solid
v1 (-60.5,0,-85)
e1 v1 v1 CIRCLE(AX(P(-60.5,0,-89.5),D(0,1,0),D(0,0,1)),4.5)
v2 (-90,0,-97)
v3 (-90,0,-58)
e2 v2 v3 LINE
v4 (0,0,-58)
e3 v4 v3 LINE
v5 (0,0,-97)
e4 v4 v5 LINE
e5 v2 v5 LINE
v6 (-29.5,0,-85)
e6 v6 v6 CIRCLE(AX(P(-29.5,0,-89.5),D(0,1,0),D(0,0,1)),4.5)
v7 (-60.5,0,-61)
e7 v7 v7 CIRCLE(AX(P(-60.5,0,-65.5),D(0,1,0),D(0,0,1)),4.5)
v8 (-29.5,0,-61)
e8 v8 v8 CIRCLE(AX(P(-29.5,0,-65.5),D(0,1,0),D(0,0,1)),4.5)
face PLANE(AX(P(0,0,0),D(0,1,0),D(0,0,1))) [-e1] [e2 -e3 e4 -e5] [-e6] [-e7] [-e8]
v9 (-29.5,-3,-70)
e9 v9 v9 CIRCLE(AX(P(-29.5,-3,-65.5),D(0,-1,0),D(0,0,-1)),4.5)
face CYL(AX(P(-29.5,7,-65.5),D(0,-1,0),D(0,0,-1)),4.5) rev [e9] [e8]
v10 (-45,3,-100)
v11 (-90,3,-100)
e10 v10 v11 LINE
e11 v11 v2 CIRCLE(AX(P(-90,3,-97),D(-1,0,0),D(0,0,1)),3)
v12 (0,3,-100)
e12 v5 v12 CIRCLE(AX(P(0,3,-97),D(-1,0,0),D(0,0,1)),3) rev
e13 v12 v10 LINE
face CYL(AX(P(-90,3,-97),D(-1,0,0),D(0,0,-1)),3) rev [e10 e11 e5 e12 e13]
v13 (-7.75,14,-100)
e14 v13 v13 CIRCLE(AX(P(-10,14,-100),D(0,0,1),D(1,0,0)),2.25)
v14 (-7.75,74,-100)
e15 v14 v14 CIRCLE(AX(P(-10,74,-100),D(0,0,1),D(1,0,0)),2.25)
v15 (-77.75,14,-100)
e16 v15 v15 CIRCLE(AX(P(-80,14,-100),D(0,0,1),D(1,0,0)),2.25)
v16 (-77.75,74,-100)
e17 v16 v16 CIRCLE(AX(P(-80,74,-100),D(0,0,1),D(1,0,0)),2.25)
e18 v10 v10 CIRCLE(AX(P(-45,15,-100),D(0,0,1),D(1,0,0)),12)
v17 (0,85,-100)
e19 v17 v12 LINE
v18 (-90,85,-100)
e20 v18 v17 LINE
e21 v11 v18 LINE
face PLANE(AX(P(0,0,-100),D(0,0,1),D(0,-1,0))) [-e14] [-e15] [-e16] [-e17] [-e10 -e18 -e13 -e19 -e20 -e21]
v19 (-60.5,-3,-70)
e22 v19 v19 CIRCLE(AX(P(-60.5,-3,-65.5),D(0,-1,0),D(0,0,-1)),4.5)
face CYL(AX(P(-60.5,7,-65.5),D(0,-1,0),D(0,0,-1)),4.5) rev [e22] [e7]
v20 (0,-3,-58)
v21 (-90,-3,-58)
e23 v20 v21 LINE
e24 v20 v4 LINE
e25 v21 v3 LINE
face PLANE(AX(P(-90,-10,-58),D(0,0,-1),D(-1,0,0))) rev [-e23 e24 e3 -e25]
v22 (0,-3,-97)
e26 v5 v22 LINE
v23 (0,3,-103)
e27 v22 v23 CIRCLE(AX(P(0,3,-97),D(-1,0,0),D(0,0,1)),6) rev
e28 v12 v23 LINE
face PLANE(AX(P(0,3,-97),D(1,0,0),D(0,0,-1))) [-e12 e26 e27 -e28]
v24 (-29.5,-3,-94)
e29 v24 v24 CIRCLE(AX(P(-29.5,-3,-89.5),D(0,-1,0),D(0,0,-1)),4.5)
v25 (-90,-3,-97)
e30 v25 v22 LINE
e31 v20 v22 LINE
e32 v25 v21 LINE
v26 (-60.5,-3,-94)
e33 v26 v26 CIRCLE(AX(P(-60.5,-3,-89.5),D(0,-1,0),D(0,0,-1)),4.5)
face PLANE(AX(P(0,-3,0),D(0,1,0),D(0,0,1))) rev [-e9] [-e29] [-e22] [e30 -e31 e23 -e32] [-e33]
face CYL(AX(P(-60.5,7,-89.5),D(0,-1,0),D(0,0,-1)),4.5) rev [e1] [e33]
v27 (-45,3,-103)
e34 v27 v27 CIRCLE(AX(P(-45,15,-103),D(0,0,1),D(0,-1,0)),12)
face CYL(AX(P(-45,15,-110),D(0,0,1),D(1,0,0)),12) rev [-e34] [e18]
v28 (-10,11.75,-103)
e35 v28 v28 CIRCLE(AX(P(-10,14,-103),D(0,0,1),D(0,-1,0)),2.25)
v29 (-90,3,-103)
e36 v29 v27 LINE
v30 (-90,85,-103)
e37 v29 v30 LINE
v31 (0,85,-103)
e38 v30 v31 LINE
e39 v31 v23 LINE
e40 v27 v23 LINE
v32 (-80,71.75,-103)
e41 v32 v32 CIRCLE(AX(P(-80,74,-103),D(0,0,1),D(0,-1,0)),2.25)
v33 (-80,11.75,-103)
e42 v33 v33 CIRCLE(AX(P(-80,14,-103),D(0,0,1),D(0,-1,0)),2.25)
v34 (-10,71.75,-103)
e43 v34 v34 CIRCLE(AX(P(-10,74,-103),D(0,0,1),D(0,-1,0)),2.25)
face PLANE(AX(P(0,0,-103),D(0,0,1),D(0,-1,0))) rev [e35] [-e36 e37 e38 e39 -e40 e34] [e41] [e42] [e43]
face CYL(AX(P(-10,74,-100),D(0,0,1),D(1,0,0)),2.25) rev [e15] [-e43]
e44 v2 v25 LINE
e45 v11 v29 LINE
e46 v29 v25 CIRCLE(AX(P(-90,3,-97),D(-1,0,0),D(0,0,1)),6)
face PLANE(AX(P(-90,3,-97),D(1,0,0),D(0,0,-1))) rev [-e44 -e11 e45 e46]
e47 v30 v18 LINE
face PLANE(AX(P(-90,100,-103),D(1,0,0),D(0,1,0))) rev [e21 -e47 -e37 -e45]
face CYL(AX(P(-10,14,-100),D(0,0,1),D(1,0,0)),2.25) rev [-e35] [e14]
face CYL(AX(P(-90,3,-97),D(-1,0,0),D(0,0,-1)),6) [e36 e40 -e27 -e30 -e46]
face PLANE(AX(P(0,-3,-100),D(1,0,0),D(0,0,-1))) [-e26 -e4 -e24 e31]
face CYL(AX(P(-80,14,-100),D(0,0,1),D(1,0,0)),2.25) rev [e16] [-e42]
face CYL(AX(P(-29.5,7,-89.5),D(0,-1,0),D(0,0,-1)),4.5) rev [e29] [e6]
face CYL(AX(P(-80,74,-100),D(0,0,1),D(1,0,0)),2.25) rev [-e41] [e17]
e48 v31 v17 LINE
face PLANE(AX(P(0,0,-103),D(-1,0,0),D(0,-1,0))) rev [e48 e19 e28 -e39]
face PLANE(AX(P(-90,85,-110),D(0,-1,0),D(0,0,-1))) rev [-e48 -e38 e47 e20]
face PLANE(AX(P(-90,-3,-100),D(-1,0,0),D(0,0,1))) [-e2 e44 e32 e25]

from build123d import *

# Parameters (mm, degrees)
SCHIZZO1_W                     = 90
SCHIZZO1_H                     = 100
BASE_FLANGIA1_DEPTH            = 3
BORDO_FLANGIA1_STRIP_W         = 18
BORDO_FLANGIA1_STRIP_H         = 3
BORDO_FLANGIA1_STRIP_CUT_DEPTH = 90
BORDO_FLANGIA1_DEPTH           = 90
RACCORDO1_R                    = 10
SCHIZZO10_R                    = 4.5
TAGLIO_ESTRUSIONE1_DEPTH       = 10
SCHIZZO9_R                     = 12
TAGLIO_ESTRUSIONE2_DEPTH       = 10
SCHIZZO11_W                    = 90
SCHIZZO11_H                    = 58
TAGLIO_ESTRUSIONE3_DEPTH       = 10
SCHIZZO12_W                    = 90
SCHIZZO12_H                    = 15
TAGLIO_ESTRUSIONE4_DEPTH       = 10
FORO_START                     = -103
FORO_PER_VITE_M4_1_OUTLINE_R   = 2.25
FORO_PER_VITE_M4_1_DEPTH       = 3


# Read off the part's stored shape, not the designer's step: Foro per Vite M4-1
# Sheet-metal steps are written as plain solids
with BuildPart() as part:
    # Schizzo1 → Base-Flangia1 (new body)
    with BuildSketch(Plane(origin=(0, 0, 0), x_dir=(1, 0, 0), z_dir=(0, 1, 0))):
        with Locations((-45, 50)):
            Rectangle(SCHIZZO1_W, SCHIZZO1_H)
    extrude(amount=-BASE_FLANGIA1_DEPTH)

    # Bordo-Flangia1 strip (across the edge) → Bordo-Flangia1 strip cut (cut)
    with BuildSketch(Plane(origin=(0, 0, -100), x_dir=(0, 0, 1), z_dir=(-1, 0, 0))):
        with Locations((-6, -1.5)):
            Rectangle(BORDO_FLANGIA1_STRIP_W, BORDO_FLANGIA1_STRIP_H)
    extrude(amount=BORDO_FLANGIA1_STRIP_CUT_DEPTH, mode=Mode.SUBTRACT)

    # Bordo-Flangia1 section (across the edge) → Bordo-Flangia1 (add)
    with BuildSketch(Plane(origin=(0, 0, -100), x_dir=(0, 0, 1), z_dir=(-1, 0, 0))):
        with BuildLine():
            Line((-3, 3), (-3, 100))
            Line((-3, 100), (0, 100))
            Line((0, 100), (0, 3))
            ThreePointArc((0, 3), (0.878679656, 0.878679656), (3, 0))
            Line((3, 0), (3, -3))
            ThreePointArc((3, -3), (-1.242640687, -1.242640687), (-3, 3))
        make_face()
    extrude(amount=BORDO_FLANGIA1_DEPTH)

    # Raccordo1
    raccordo1_edges = [part.edges().sort_by_distance(p)[0] for p in [
        (0, 100, -101.5),
        (-90, 100, -101.5),
        (0, -1.5, 0),
        (-90, -1.5, 0),
    ]]
    fillet(raccordo1_edges, radius=RACCORDO1_R)

    # Schizzo10 → Taglio-Estrusione1 (cut)
    with BuildSketch(Plane.XZ.offset(3)):
        with Locations(Location((-60.5, -89.5, 0), (0, 0, 270))):
            Circle(SCHIZZO10_R)
        with Locations(Location((-60.5, -65.5, 0), (0, 0, 270))):
            Circle(SCHIZZO10_R)
        with Locations(Location((-29.5, -65.5, 0), (0, 0, 270))):
            Circle(SCHIZZO10_R)
        with Locations(Location((-29.5, -89.5, 0), (0, 0, 270))):
            Circle(SCHIZZO10_R)
    extrude(amount=-TAGLIO_ESTRUSIONE1_DEPTH, mode=Mode.SUBTRACT)

    # Schizzo9 → Taglio-Estrusione2 (cut)
    with BuildSketch(Plane.XY.offset(-100)):
        with Locations(Location((-45, 15, 0), (0, 0, 270))):
            Circle(SCHIZZO9_R)
    extrude(amount=-TAGLIO_ESTRUSIONE2_DEPTH, mode=Mode.SUBTRACT)

    # Schizzo11 → Taglio-Estrusione3 (cut)
    with BuildSketch(Plane(origin=(0, 0, 0), x_dir=(1, 0, 0), z_dir=(0, 1, 0))):
        with Locations((-45, 29)):
            Rectangle(SCHIZZO11_W, SCHIZZO11_H)
    extrude(amount=-TAGLIO_ESTRUSIONE3_DEPTH, mode=Mode.SUBTRACT)

    # Schizzo12 → Taglio-Estrusione4 (cut)
    with BuildSketch(Plane.XY.offset(-100)):
        with Locations((-45, 92.5)):
            Rectangle(SCHIZZO12_W, SCHIZZO12_H)
    extrude(amount=-TAGLIO_ESTRUSIONE4_DEPTH, mode=Mode.SUBTRACT)

    # Foro per Vite M4-1 outline → Foro per Vite M4-1 (cut)
    with BuildSketch(Plane.XY.offset(FORO_START)):
        with Locations((-10, 74)):
            Circle(FORO_PER_VITE_M4_1_OUTLINE_R)
        with Locations((-80, 14)):
            Circle(FORO_PER_VITE_M4_1_OUTLINE_R)
        with Locations((-10, 14)):
            Circle(FORO_PER_VITE_M4_1_OUTLINE_R)
        with Locations((-80, 74)):
            Circle(FORO_PER_VITE_M4_1_OUTLINE_R)
    extrude(amount=FORO_PER_VITE_M4_1_DEPTH, mode=Mode.SUBTRACT)


solid = part.part
